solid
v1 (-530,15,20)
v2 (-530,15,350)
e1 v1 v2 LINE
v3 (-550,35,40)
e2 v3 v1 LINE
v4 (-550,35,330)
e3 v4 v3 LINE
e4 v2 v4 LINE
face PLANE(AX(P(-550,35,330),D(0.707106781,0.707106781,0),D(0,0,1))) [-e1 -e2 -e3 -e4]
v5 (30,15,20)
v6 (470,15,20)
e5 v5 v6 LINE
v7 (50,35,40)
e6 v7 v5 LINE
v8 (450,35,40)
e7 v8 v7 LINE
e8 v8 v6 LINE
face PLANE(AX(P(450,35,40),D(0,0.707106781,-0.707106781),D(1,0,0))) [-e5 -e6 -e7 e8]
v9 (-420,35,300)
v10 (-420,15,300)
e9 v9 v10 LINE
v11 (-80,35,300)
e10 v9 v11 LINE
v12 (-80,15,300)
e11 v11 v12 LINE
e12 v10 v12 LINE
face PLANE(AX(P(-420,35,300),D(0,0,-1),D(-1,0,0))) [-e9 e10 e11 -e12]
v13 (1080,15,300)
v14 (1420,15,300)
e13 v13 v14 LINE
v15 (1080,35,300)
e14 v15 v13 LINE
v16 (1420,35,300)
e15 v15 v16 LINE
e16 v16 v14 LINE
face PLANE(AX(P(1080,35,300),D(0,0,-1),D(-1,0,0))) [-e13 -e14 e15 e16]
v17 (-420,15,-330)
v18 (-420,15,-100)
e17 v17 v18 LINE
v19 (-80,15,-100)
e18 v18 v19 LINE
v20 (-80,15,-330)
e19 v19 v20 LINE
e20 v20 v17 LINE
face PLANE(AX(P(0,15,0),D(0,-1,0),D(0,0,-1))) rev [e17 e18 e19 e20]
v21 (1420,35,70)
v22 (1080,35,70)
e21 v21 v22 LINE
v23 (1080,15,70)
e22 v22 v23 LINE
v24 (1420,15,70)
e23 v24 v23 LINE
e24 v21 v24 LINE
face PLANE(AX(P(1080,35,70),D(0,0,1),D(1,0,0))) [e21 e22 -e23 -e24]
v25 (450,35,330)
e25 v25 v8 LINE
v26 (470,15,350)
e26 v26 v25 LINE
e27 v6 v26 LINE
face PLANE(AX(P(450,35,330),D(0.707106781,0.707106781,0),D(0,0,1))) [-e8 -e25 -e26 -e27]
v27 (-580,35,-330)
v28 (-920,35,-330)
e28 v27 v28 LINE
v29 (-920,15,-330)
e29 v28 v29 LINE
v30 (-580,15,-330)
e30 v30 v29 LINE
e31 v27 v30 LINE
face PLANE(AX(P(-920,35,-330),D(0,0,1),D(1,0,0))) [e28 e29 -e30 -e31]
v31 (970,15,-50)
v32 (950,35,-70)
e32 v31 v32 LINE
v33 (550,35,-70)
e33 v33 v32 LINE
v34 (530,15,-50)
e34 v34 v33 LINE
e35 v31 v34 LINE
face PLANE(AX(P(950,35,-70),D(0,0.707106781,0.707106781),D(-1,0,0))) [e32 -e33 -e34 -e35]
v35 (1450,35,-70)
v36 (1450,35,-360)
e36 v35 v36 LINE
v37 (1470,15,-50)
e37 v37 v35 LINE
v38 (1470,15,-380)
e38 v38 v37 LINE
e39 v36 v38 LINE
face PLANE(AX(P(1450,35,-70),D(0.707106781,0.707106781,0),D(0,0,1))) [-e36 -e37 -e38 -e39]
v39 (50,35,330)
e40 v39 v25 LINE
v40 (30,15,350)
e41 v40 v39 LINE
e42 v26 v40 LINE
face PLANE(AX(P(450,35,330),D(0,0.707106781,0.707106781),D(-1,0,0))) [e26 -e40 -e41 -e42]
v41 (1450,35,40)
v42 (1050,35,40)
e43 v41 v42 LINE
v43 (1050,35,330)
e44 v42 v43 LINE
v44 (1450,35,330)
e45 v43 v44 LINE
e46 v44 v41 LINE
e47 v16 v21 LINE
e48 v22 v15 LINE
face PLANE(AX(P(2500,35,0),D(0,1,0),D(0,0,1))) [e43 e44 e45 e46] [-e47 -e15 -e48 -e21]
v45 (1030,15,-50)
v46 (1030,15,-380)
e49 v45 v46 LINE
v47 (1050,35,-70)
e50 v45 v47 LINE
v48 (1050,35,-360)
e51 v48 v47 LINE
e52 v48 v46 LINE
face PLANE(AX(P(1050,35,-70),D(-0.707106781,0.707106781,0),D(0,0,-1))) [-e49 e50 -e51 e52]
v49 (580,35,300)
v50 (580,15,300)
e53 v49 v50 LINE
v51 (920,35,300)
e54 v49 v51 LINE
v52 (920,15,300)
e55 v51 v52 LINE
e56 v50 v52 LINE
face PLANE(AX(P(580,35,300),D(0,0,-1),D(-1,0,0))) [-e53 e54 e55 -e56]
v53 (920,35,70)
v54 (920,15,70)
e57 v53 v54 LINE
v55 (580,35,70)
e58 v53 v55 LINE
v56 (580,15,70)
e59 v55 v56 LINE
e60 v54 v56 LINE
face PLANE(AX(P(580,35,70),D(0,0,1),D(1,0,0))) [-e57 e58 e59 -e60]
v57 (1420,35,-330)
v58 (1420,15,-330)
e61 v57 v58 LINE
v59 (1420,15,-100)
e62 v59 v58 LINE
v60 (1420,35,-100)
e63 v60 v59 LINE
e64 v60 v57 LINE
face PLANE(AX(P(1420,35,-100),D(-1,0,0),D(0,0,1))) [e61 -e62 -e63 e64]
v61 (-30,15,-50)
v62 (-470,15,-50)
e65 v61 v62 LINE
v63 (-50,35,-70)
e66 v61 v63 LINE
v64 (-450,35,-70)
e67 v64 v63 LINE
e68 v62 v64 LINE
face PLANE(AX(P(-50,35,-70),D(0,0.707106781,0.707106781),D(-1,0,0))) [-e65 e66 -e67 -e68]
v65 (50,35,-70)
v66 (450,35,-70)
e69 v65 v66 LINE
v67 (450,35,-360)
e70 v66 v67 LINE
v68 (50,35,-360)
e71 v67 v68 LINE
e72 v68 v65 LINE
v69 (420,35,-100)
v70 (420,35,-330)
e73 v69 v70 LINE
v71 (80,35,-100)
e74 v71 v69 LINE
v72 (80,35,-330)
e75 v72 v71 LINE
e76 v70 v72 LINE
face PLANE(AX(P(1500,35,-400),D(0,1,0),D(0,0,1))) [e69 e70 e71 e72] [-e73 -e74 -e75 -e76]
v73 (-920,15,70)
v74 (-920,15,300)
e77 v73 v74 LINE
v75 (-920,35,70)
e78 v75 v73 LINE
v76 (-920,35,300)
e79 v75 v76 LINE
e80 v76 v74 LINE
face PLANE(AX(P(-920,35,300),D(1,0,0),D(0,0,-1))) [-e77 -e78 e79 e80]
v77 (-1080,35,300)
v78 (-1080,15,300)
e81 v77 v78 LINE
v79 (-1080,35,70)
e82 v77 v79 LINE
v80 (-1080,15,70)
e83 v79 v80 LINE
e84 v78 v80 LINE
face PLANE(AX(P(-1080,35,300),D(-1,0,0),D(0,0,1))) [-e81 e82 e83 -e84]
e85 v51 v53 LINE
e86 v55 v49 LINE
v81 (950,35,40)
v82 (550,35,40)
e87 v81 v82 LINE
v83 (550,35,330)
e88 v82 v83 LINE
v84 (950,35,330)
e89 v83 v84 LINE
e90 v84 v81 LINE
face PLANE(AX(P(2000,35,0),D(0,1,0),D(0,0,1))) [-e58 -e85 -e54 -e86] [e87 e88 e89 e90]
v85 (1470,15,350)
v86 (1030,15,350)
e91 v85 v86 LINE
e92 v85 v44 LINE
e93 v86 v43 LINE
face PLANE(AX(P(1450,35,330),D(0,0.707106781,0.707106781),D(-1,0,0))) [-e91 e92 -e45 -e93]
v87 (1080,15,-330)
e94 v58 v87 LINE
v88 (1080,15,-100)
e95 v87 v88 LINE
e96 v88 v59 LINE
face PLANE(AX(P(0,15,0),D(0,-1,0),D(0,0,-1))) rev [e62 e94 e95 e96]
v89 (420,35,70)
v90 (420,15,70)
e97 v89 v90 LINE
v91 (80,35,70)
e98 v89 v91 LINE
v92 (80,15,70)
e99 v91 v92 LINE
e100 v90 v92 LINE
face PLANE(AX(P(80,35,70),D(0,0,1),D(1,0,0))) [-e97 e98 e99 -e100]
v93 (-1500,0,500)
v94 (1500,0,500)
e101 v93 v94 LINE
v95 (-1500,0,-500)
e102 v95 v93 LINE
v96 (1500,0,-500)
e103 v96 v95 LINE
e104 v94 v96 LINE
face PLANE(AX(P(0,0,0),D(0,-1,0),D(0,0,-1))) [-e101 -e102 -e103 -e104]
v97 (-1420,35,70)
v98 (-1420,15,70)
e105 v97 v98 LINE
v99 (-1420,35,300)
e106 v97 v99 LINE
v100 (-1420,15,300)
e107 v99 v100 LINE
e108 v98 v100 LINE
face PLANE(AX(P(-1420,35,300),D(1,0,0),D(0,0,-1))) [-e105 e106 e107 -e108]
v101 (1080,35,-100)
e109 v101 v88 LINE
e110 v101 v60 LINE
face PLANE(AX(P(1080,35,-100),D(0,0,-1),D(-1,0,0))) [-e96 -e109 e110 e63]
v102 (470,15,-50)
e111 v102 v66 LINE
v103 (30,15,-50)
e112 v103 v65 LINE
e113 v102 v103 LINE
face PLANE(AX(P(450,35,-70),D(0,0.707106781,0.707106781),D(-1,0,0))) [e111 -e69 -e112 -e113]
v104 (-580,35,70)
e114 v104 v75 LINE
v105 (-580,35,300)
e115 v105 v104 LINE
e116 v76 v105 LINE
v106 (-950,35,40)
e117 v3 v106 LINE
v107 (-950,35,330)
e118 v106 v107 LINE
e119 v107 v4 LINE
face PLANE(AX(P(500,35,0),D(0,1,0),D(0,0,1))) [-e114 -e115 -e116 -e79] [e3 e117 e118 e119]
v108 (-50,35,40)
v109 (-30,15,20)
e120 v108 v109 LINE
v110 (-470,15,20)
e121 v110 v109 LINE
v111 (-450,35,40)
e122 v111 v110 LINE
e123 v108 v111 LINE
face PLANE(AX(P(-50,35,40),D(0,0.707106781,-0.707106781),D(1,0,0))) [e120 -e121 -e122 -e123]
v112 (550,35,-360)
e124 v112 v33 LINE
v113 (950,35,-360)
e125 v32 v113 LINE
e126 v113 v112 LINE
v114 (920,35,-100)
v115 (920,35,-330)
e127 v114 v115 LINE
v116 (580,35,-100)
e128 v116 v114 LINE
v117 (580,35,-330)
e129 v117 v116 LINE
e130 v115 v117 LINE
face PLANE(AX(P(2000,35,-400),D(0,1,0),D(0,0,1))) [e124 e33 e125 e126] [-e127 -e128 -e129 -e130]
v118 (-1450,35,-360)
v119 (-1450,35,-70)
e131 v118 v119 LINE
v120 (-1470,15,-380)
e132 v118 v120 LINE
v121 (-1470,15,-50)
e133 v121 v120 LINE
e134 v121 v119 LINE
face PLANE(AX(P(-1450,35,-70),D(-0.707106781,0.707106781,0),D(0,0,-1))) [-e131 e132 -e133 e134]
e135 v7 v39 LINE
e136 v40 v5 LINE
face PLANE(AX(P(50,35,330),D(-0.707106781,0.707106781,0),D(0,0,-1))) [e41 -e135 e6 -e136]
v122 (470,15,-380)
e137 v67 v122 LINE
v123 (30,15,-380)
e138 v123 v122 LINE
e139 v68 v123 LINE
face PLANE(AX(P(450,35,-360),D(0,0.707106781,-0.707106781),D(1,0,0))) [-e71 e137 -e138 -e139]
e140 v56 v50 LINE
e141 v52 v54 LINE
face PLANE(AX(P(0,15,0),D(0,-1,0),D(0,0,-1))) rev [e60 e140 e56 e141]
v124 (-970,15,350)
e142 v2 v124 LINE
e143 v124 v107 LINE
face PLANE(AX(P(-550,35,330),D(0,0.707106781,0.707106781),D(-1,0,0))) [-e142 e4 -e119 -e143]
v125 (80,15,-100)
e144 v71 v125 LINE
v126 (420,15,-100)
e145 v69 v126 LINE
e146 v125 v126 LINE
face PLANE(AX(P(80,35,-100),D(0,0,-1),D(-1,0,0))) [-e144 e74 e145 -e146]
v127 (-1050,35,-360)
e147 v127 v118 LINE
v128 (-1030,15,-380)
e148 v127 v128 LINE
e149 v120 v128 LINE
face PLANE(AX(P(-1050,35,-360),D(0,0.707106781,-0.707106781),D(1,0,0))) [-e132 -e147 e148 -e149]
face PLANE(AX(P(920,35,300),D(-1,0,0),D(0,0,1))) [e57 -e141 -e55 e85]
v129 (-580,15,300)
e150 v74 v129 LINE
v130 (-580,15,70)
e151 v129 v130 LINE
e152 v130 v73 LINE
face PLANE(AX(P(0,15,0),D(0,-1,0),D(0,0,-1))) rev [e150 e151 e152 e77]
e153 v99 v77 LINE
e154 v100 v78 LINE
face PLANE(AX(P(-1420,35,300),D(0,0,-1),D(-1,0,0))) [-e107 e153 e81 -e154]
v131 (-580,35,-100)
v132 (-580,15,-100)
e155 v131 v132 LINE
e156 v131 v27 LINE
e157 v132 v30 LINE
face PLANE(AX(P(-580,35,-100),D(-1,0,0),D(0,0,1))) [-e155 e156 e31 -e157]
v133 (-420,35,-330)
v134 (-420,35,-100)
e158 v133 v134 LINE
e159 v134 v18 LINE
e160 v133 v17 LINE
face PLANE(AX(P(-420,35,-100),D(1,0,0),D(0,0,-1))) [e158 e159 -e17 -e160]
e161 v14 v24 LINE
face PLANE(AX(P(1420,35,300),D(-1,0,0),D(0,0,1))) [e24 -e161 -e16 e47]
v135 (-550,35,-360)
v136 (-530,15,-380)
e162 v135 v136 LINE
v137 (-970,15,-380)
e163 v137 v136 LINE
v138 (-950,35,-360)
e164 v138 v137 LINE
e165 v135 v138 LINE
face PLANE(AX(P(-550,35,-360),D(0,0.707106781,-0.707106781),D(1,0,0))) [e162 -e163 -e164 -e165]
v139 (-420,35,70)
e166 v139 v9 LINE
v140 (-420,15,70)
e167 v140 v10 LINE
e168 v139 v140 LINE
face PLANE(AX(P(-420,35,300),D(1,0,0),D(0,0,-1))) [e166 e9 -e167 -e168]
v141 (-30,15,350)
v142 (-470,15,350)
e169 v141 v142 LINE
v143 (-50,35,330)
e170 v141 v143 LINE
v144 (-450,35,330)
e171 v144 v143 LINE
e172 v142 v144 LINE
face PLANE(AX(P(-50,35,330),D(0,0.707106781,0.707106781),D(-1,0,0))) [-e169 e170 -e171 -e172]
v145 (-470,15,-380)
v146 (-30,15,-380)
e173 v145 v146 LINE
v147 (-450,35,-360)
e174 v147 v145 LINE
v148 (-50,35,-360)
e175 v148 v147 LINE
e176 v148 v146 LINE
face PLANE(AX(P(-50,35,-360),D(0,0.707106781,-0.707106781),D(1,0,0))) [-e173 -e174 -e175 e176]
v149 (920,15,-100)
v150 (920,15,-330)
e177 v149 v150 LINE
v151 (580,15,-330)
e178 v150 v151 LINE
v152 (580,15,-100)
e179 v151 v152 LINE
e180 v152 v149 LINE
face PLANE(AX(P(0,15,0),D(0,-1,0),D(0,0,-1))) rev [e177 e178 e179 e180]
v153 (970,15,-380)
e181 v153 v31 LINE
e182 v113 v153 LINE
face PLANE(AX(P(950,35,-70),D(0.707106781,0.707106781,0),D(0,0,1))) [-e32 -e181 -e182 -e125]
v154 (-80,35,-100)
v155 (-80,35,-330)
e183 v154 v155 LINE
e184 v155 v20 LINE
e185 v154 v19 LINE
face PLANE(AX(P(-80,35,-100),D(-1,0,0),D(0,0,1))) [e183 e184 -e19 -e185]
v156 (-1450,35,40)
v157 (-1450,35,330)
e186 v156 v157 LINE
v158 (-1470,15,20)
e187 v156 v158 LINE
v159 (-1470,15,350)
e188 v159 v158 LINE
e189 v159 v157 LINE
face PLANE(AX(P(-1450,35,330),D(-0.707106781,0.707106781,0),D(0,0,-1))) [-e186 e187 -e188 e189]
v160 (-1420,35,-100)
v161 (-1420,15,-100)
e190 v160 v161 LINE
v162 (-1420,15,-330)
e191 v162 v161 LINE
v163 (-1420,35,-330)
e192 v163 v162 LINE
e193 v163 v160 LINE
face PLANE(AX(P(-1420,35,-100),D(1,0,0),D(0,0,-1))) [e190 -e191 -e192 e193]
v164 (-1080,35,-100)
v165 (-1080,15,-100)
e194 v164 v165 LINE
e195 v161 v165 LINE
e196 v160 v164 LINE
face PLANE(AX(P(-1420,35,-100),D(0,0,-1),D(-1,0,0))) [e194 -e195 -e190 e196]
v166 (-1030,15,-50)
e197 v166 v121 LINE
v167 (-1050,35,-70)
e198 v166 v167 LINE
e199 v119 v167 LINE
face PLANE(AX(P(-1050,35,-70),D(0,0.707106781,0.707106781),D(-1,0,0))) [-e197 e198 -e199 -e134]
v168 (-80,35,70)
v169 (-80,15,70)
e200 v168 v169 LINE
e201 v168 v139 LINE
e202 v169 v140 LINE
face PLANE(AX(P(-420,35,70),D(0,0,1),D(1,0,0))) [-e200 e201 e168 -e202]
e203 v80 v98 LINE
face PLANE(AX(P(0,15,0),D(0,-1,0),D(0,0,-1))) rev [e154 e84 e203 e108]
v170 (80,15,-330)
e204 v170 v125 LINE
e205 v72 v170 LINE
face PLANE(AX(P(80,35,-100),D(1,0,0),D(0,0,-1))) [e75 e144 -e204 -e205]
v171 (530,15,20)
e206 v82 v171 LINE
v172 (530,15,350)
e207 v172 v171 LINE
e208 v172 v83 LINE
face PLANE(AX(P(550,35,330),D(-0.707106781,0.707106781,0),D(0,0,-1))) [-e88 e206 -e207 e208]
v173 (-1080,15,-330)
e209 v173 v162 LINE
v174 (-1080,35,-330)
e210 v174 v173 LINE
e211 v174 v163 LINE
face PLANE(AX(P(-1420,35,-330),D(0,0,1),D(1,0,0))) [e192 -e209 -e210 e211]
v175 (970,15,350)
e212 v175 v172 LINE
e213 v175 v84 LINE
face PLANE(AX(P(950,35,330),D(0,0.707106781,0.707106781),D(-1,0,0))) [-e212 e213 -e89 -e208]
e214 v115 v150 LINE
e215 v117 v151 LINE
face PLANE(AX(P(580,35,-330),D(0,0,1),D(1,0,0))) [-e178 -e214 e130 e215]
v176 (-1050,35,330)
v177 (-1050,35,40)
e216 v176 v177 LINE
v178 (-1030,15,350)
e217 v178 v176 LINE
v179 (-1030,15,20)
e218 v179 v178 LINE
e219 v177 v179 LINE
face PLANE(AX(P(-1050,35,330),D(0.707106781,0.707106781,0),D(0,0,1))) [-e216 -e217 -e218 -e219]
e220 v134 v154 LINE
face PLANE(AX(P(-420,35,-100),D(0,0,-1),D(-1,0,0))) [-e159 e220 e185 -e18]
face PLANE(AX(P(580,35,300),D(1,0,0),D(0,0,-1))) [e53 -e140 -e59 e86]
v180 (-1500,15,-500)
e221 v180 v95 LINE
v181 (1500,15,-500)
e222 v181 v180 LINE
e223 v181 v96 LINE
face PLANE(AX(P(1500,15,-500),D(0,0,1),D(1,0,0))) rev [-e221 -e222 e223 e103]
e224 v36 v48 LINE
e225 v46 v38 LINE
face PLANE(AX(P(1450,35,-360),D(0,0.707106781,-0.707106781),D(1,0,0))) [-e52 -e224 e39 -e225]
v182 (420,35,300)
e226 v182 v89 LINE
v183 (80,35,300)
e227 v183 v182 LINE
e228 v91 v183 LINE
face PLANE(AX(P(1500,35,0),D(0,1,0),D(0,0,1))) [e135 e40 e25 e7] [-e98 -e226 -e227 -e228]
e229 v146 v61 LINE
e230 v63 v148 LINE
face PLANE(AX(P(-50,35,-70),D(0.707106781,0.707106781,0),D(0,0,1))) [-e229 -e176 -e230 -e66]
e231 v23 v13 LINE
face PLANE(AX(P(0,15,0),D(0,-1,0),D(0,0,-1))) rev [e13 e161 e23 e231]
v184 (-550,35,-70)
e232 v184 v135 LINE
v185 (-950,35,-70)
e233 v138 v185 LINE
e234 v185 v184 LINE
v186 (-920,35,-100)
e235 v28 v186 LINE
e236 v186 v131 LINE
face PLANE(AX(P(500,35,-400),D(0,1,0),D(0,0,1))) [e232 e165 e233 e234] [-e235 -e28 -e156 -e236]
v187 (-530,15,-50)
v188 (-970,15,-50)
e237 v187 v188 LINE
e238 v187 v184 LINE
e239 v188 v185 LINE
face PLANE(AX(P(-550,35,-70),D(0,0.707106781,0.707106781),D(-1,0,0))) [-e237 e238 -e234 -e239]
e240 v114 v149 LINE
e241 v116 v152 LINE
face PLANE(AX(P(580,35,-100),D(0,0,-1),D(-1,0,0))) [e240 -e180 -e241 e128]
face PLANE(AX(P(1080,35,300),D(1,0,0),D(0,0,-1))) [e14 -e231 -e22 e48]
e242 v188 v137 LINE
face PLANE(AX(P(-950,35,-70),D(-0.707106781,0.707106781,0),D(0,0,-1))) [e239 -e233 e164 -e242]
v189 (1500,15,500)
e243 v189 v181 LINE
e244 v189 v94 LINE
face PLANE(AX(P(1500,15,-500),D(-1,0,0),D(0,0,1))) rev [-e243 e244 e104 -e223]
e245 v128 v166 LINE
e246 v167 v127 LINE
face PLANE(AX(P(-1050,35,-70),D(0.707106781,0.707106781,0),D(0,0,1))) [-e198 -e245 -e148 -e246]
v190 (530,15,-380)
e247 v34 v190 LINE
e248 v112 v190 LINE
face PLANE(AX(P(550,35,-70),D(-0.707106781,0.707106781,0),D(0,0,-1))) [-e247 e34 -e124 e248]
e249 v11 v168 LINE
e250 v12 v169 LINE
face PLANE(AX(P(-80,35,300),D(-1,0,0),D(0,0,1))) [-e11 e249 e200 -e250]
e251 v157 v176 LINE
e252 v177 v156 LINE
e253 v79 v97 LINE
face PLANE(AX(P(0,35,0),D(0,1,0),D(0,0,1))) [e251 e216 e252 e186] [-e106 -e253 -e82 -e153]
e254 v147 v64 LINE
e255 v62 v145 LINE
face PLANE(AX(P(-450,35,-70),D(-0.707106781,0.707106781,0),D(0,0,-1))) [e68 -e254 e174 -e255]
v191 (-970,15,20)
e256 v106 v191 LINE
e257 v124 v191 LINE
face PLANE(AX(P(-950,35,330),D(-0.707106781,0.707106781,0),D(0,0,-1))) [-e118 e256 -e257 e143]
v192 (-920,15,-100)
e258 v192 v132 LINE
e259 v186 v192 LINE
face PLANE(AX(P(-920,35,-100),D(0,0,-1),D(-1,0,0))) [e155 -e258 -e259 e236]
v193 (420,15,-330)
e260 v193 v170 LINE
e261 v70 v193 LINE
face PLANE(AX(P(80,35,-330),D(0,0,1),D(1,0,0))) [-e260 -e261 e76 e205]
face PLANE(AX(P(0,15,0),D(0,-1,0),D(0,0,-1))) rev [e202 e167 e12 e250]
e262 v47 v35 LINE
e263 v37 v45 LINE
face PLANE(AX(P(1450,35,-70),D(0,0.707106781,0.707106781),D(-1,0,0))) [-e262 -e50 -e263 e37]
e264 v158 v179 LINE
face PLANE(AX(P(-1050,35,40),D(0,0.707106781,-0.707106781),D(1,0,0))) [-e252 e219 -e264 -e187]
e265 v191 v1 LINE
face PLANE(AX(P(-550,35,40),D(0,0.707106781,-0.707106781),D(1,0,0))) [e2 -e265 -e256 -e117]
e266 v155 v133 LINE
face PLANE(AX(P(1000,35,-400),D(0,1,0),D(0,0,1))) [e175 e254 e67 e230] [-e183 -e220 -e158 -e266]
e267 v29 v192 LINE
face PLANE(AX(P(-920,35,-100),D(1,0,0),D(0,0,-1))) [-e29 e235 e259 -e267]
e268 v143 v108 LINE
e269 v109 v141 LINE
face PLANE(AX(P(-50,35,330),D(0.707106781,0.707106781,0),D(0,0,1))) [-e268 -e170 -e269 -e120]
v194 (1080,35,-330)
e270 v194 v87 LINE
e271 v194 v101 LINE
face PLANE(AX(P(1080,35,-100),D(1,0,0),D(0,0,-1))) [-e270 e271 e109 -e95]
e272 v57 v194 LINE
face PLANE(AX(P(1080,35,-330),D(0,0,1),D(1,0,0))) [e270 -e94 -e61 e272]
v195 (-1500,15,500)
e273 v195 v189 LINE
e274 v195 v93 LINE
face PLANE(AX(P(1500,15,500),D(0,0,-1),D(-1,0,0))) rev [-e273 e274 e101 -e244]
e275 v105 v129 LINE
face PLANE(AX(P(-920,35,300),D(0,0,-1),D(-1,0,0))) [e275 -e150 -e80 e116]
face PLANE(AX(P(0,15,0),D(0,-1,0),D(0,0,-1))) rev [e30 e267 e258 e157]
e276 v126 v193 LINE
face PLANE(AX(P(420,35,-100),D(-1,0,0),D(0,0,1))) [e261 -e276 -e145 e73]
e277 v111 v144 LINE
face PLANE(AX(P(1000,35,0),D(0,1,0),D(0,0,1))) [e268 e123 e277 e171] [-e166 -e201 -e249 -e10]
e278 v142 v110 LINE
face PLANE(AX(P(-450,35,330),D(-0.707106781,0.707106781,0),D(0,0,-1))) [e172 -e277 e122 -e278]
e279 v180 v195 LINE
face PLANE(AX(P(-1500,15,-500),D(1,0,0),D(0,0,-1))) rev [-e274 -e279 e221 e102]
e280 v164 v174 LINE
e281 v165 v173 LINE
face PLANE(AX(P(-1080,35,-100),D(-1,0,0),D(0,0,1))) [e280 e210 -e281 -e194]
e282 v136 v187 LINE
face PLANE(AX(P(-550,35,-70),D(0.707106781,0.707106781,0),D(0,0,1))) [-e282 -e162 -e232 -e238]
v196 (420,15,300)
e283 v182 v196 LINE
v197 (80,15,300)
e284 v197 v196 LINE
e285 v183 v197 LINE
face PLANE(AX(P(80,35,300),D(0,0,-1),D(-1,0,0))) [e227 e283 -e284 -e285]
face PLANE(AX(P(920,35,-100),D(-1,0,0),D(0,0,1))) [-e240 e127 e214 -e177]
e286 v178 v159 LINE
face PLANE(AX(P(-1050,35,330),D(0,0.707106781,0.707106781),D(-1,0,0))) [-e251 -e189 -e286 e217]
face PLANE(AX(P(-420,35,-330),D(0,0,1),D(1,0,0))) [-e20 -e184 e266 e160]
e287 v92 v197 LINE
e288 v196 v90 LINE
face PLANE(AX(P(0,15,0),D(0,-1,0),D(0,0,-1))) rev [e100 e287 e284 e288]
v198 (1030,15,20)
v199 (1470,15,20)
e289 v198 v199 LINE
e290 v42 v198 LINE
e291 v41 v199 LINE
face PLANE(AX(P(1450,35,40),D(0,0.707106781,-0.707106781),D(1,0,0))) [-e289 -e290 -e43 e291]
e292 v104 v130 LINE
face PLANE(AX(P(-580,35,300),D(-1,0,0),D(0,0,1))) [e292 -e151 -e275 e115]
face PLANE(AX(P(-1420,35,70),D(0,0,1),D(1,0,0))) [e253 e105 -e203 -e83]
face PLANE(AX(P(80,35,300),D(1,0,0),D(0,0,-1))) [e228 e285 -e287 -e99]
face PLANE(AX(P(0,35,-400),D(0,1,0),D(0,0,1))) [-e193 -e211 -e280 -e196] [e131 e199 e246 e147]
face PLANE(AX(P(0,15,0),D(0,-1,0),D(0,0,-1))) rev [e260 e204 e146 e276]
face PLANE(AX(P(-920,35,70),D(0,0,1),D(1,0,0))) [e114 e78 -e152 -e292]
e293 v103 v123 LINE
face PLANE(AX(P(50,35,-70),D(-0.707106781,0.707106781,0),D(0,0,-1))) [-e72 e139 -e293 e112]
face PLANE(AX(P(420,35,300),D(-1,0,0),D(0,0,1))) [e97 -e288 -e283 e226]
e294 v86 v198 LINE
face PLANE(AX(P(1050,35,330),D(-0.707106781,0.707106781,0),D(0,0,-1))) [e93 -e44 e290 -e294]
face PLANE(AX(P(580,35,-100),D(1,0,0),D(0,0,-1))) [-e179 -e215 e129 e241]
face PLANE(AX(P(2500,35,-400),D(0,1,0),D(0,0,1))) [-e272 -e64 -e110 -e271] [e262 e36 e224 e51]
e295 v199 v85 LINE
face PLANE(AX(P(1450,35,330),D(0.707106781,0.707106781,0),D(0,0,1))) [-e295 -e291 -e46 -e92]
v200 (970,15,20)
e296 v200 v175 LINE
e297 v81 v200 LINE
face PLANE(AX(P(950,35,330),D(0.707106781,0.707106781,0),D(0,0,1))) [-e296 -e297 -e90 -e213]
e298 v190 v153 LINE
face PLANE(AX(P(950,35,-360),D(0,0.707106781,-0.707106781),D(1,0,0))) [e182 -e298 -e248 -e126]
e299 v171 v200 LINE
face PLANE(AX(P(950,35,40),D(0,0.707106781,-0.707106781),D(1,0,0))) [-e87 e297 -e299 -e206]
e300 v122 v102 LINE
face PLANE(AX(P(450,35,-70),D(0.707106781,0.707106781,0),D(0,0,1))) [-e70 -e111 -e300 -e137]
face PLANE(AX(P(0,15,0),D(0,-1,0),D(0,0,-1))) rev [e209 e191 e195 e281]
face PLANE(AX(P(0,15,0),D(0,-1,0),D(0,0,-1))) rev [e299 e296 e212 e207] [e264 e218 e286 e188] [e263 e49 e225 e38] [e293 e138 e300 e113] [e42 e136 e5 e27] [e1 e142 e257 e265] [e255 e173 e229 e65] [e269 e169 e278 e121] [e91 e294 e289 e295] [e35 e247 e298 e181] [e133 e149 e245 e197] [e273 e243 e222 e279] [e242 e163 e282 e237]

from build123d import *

# Parameters (mm, degrees)
SKETCH1_W                  = 3000
SKETCH1_H                  = 1000
BOSS_EXTRUDE1_DEPTH        = 15
SKETCH2_W                  = 400
SKETCH2_H                  = 290
SKETCH2_W_2                = 340
SKETCH2_H_2                = 230
BOSS_EXTRUDE2_DEPTH        = 20
CHAMFER1_SIZE              = 20
LPATTERN1_COUNT            = 6
LPATTERN1_PITCH            = 500
LPATTERN1_COUNT_DIR2       = 2
LPATTERN1_PITCH_DIR2       = 400
CHAMFER1_OF_LPATTERN1_SIZE = 20


with BuildPart() as part:
    # Sketch1 → Boss-Extrude1 (new body)
    with BuildSketch(Plane(origin=(0, 0, 0), x_dir=(1, 0, 0), z_dir=(0, 1, 0))):
        Rectangle(SKETCH1_W, SKETCH1_H)
    extrude(amount=BOSS_EXTRUDE1_DEPTH)

    # Sketch2 → Boss-Extrude2 (add)
    with BuildSketch(Plane(origin=(0, 15, 0), x_dir=(1, 0, 0), z_dir=(0, 1, 0))):
        with Locations((-1250, -185)):
            Rectangle(SKETCH2_W, SKETCH2_H)
        with Locations((-1250, -185)):
            Rectangle(SKETCH2_W_2, SKETCH2_H_2, mode=Mode.SUBTRACT)
    boss_extrude2 = extrude(amount=BOSS_EXTRUDE2_DEPTH)

    # Chamfer1
    chamfer1_edges = [part.edges().sort_by_distance(p)[0] for p in [
        (-1450, 15, 185),
        (-1050, 15, 185),
        (-1250, 15, 330),
        (-1250, 15, 40),
    ]]
    chamfer(chamfer1_edges, length=CHAMFER1_SIZE - 0.0001)  # a hair under: the kernel refuses the full size

    # LPattern1: Boss-Extrude2 6 × 2
    with Locations(*[(i * LPATTERN1_PITCH, 0, -j * LPATTERN1_PITCH_DIR2) for i in range(LPATTERN1_COUNT) for j in range(LPATTERN1_COUNT_DIR2) if (i, j) != (0, 0)]):
        add(boss_extrude2)

    # Chamfer1 of LPattern1
    chamfer1_of_lpattern1_edges = [part.edges().sort_by_distance(p)[0] for p in [
        (-1450, 15, -215),
        (-1050, 15, -215),
        (-1250, 15, -70),
        (-1250, 15, -360),
        (-950, 15, 185),
        (-550, 15, 185),
        (-750, 15, 330),
        (-750, 15, 40),
        (-950, 15, -215),
        (-550, 15, -215),
        (-750, 15, -70),
        (-750, 15, -360),
        (-450, 15, 185),
        (-50, 15, 185),
        (-250, 15, 330),
        (-250, 15, 40),
        (-450, 15, -215),
        (-50, 15, -215),
        (-250, 15, -70),
        (-250, 15, -360),
        (50, 15, 185),
        (450, 15, 185),
        (250, 15, 330),
        (250, 15, 40),
        (50, 15, -215),
        (450, 15, -215),
        (250, 15, -70),
        (250, 15, -360),
        (550, 15, 185),
        (950, 15, 185),
        (750, 15, 330),
        (750, 15, 40),
        (550, 15, -215),
        (950, 15, -215),
        (750, 15, -70),
        (750, 15, -360),
        (1050, 15, 185),
        (1450, 15, 185),
        (1250, 15, 330),
        (1250, 15, 40),
        (1050, 15, -215),
        (1450, 15, -215),
        (1250, 15, -70),
        (1250, 15, -360),
    ]]
    chamfer(chamfer1_of_lpattern1_edges, length=CHAMFER1_OF_LPATTERN1_SIZE - 0.0001)  # a hair under: the kernel refuses the full size


solid = part.part
